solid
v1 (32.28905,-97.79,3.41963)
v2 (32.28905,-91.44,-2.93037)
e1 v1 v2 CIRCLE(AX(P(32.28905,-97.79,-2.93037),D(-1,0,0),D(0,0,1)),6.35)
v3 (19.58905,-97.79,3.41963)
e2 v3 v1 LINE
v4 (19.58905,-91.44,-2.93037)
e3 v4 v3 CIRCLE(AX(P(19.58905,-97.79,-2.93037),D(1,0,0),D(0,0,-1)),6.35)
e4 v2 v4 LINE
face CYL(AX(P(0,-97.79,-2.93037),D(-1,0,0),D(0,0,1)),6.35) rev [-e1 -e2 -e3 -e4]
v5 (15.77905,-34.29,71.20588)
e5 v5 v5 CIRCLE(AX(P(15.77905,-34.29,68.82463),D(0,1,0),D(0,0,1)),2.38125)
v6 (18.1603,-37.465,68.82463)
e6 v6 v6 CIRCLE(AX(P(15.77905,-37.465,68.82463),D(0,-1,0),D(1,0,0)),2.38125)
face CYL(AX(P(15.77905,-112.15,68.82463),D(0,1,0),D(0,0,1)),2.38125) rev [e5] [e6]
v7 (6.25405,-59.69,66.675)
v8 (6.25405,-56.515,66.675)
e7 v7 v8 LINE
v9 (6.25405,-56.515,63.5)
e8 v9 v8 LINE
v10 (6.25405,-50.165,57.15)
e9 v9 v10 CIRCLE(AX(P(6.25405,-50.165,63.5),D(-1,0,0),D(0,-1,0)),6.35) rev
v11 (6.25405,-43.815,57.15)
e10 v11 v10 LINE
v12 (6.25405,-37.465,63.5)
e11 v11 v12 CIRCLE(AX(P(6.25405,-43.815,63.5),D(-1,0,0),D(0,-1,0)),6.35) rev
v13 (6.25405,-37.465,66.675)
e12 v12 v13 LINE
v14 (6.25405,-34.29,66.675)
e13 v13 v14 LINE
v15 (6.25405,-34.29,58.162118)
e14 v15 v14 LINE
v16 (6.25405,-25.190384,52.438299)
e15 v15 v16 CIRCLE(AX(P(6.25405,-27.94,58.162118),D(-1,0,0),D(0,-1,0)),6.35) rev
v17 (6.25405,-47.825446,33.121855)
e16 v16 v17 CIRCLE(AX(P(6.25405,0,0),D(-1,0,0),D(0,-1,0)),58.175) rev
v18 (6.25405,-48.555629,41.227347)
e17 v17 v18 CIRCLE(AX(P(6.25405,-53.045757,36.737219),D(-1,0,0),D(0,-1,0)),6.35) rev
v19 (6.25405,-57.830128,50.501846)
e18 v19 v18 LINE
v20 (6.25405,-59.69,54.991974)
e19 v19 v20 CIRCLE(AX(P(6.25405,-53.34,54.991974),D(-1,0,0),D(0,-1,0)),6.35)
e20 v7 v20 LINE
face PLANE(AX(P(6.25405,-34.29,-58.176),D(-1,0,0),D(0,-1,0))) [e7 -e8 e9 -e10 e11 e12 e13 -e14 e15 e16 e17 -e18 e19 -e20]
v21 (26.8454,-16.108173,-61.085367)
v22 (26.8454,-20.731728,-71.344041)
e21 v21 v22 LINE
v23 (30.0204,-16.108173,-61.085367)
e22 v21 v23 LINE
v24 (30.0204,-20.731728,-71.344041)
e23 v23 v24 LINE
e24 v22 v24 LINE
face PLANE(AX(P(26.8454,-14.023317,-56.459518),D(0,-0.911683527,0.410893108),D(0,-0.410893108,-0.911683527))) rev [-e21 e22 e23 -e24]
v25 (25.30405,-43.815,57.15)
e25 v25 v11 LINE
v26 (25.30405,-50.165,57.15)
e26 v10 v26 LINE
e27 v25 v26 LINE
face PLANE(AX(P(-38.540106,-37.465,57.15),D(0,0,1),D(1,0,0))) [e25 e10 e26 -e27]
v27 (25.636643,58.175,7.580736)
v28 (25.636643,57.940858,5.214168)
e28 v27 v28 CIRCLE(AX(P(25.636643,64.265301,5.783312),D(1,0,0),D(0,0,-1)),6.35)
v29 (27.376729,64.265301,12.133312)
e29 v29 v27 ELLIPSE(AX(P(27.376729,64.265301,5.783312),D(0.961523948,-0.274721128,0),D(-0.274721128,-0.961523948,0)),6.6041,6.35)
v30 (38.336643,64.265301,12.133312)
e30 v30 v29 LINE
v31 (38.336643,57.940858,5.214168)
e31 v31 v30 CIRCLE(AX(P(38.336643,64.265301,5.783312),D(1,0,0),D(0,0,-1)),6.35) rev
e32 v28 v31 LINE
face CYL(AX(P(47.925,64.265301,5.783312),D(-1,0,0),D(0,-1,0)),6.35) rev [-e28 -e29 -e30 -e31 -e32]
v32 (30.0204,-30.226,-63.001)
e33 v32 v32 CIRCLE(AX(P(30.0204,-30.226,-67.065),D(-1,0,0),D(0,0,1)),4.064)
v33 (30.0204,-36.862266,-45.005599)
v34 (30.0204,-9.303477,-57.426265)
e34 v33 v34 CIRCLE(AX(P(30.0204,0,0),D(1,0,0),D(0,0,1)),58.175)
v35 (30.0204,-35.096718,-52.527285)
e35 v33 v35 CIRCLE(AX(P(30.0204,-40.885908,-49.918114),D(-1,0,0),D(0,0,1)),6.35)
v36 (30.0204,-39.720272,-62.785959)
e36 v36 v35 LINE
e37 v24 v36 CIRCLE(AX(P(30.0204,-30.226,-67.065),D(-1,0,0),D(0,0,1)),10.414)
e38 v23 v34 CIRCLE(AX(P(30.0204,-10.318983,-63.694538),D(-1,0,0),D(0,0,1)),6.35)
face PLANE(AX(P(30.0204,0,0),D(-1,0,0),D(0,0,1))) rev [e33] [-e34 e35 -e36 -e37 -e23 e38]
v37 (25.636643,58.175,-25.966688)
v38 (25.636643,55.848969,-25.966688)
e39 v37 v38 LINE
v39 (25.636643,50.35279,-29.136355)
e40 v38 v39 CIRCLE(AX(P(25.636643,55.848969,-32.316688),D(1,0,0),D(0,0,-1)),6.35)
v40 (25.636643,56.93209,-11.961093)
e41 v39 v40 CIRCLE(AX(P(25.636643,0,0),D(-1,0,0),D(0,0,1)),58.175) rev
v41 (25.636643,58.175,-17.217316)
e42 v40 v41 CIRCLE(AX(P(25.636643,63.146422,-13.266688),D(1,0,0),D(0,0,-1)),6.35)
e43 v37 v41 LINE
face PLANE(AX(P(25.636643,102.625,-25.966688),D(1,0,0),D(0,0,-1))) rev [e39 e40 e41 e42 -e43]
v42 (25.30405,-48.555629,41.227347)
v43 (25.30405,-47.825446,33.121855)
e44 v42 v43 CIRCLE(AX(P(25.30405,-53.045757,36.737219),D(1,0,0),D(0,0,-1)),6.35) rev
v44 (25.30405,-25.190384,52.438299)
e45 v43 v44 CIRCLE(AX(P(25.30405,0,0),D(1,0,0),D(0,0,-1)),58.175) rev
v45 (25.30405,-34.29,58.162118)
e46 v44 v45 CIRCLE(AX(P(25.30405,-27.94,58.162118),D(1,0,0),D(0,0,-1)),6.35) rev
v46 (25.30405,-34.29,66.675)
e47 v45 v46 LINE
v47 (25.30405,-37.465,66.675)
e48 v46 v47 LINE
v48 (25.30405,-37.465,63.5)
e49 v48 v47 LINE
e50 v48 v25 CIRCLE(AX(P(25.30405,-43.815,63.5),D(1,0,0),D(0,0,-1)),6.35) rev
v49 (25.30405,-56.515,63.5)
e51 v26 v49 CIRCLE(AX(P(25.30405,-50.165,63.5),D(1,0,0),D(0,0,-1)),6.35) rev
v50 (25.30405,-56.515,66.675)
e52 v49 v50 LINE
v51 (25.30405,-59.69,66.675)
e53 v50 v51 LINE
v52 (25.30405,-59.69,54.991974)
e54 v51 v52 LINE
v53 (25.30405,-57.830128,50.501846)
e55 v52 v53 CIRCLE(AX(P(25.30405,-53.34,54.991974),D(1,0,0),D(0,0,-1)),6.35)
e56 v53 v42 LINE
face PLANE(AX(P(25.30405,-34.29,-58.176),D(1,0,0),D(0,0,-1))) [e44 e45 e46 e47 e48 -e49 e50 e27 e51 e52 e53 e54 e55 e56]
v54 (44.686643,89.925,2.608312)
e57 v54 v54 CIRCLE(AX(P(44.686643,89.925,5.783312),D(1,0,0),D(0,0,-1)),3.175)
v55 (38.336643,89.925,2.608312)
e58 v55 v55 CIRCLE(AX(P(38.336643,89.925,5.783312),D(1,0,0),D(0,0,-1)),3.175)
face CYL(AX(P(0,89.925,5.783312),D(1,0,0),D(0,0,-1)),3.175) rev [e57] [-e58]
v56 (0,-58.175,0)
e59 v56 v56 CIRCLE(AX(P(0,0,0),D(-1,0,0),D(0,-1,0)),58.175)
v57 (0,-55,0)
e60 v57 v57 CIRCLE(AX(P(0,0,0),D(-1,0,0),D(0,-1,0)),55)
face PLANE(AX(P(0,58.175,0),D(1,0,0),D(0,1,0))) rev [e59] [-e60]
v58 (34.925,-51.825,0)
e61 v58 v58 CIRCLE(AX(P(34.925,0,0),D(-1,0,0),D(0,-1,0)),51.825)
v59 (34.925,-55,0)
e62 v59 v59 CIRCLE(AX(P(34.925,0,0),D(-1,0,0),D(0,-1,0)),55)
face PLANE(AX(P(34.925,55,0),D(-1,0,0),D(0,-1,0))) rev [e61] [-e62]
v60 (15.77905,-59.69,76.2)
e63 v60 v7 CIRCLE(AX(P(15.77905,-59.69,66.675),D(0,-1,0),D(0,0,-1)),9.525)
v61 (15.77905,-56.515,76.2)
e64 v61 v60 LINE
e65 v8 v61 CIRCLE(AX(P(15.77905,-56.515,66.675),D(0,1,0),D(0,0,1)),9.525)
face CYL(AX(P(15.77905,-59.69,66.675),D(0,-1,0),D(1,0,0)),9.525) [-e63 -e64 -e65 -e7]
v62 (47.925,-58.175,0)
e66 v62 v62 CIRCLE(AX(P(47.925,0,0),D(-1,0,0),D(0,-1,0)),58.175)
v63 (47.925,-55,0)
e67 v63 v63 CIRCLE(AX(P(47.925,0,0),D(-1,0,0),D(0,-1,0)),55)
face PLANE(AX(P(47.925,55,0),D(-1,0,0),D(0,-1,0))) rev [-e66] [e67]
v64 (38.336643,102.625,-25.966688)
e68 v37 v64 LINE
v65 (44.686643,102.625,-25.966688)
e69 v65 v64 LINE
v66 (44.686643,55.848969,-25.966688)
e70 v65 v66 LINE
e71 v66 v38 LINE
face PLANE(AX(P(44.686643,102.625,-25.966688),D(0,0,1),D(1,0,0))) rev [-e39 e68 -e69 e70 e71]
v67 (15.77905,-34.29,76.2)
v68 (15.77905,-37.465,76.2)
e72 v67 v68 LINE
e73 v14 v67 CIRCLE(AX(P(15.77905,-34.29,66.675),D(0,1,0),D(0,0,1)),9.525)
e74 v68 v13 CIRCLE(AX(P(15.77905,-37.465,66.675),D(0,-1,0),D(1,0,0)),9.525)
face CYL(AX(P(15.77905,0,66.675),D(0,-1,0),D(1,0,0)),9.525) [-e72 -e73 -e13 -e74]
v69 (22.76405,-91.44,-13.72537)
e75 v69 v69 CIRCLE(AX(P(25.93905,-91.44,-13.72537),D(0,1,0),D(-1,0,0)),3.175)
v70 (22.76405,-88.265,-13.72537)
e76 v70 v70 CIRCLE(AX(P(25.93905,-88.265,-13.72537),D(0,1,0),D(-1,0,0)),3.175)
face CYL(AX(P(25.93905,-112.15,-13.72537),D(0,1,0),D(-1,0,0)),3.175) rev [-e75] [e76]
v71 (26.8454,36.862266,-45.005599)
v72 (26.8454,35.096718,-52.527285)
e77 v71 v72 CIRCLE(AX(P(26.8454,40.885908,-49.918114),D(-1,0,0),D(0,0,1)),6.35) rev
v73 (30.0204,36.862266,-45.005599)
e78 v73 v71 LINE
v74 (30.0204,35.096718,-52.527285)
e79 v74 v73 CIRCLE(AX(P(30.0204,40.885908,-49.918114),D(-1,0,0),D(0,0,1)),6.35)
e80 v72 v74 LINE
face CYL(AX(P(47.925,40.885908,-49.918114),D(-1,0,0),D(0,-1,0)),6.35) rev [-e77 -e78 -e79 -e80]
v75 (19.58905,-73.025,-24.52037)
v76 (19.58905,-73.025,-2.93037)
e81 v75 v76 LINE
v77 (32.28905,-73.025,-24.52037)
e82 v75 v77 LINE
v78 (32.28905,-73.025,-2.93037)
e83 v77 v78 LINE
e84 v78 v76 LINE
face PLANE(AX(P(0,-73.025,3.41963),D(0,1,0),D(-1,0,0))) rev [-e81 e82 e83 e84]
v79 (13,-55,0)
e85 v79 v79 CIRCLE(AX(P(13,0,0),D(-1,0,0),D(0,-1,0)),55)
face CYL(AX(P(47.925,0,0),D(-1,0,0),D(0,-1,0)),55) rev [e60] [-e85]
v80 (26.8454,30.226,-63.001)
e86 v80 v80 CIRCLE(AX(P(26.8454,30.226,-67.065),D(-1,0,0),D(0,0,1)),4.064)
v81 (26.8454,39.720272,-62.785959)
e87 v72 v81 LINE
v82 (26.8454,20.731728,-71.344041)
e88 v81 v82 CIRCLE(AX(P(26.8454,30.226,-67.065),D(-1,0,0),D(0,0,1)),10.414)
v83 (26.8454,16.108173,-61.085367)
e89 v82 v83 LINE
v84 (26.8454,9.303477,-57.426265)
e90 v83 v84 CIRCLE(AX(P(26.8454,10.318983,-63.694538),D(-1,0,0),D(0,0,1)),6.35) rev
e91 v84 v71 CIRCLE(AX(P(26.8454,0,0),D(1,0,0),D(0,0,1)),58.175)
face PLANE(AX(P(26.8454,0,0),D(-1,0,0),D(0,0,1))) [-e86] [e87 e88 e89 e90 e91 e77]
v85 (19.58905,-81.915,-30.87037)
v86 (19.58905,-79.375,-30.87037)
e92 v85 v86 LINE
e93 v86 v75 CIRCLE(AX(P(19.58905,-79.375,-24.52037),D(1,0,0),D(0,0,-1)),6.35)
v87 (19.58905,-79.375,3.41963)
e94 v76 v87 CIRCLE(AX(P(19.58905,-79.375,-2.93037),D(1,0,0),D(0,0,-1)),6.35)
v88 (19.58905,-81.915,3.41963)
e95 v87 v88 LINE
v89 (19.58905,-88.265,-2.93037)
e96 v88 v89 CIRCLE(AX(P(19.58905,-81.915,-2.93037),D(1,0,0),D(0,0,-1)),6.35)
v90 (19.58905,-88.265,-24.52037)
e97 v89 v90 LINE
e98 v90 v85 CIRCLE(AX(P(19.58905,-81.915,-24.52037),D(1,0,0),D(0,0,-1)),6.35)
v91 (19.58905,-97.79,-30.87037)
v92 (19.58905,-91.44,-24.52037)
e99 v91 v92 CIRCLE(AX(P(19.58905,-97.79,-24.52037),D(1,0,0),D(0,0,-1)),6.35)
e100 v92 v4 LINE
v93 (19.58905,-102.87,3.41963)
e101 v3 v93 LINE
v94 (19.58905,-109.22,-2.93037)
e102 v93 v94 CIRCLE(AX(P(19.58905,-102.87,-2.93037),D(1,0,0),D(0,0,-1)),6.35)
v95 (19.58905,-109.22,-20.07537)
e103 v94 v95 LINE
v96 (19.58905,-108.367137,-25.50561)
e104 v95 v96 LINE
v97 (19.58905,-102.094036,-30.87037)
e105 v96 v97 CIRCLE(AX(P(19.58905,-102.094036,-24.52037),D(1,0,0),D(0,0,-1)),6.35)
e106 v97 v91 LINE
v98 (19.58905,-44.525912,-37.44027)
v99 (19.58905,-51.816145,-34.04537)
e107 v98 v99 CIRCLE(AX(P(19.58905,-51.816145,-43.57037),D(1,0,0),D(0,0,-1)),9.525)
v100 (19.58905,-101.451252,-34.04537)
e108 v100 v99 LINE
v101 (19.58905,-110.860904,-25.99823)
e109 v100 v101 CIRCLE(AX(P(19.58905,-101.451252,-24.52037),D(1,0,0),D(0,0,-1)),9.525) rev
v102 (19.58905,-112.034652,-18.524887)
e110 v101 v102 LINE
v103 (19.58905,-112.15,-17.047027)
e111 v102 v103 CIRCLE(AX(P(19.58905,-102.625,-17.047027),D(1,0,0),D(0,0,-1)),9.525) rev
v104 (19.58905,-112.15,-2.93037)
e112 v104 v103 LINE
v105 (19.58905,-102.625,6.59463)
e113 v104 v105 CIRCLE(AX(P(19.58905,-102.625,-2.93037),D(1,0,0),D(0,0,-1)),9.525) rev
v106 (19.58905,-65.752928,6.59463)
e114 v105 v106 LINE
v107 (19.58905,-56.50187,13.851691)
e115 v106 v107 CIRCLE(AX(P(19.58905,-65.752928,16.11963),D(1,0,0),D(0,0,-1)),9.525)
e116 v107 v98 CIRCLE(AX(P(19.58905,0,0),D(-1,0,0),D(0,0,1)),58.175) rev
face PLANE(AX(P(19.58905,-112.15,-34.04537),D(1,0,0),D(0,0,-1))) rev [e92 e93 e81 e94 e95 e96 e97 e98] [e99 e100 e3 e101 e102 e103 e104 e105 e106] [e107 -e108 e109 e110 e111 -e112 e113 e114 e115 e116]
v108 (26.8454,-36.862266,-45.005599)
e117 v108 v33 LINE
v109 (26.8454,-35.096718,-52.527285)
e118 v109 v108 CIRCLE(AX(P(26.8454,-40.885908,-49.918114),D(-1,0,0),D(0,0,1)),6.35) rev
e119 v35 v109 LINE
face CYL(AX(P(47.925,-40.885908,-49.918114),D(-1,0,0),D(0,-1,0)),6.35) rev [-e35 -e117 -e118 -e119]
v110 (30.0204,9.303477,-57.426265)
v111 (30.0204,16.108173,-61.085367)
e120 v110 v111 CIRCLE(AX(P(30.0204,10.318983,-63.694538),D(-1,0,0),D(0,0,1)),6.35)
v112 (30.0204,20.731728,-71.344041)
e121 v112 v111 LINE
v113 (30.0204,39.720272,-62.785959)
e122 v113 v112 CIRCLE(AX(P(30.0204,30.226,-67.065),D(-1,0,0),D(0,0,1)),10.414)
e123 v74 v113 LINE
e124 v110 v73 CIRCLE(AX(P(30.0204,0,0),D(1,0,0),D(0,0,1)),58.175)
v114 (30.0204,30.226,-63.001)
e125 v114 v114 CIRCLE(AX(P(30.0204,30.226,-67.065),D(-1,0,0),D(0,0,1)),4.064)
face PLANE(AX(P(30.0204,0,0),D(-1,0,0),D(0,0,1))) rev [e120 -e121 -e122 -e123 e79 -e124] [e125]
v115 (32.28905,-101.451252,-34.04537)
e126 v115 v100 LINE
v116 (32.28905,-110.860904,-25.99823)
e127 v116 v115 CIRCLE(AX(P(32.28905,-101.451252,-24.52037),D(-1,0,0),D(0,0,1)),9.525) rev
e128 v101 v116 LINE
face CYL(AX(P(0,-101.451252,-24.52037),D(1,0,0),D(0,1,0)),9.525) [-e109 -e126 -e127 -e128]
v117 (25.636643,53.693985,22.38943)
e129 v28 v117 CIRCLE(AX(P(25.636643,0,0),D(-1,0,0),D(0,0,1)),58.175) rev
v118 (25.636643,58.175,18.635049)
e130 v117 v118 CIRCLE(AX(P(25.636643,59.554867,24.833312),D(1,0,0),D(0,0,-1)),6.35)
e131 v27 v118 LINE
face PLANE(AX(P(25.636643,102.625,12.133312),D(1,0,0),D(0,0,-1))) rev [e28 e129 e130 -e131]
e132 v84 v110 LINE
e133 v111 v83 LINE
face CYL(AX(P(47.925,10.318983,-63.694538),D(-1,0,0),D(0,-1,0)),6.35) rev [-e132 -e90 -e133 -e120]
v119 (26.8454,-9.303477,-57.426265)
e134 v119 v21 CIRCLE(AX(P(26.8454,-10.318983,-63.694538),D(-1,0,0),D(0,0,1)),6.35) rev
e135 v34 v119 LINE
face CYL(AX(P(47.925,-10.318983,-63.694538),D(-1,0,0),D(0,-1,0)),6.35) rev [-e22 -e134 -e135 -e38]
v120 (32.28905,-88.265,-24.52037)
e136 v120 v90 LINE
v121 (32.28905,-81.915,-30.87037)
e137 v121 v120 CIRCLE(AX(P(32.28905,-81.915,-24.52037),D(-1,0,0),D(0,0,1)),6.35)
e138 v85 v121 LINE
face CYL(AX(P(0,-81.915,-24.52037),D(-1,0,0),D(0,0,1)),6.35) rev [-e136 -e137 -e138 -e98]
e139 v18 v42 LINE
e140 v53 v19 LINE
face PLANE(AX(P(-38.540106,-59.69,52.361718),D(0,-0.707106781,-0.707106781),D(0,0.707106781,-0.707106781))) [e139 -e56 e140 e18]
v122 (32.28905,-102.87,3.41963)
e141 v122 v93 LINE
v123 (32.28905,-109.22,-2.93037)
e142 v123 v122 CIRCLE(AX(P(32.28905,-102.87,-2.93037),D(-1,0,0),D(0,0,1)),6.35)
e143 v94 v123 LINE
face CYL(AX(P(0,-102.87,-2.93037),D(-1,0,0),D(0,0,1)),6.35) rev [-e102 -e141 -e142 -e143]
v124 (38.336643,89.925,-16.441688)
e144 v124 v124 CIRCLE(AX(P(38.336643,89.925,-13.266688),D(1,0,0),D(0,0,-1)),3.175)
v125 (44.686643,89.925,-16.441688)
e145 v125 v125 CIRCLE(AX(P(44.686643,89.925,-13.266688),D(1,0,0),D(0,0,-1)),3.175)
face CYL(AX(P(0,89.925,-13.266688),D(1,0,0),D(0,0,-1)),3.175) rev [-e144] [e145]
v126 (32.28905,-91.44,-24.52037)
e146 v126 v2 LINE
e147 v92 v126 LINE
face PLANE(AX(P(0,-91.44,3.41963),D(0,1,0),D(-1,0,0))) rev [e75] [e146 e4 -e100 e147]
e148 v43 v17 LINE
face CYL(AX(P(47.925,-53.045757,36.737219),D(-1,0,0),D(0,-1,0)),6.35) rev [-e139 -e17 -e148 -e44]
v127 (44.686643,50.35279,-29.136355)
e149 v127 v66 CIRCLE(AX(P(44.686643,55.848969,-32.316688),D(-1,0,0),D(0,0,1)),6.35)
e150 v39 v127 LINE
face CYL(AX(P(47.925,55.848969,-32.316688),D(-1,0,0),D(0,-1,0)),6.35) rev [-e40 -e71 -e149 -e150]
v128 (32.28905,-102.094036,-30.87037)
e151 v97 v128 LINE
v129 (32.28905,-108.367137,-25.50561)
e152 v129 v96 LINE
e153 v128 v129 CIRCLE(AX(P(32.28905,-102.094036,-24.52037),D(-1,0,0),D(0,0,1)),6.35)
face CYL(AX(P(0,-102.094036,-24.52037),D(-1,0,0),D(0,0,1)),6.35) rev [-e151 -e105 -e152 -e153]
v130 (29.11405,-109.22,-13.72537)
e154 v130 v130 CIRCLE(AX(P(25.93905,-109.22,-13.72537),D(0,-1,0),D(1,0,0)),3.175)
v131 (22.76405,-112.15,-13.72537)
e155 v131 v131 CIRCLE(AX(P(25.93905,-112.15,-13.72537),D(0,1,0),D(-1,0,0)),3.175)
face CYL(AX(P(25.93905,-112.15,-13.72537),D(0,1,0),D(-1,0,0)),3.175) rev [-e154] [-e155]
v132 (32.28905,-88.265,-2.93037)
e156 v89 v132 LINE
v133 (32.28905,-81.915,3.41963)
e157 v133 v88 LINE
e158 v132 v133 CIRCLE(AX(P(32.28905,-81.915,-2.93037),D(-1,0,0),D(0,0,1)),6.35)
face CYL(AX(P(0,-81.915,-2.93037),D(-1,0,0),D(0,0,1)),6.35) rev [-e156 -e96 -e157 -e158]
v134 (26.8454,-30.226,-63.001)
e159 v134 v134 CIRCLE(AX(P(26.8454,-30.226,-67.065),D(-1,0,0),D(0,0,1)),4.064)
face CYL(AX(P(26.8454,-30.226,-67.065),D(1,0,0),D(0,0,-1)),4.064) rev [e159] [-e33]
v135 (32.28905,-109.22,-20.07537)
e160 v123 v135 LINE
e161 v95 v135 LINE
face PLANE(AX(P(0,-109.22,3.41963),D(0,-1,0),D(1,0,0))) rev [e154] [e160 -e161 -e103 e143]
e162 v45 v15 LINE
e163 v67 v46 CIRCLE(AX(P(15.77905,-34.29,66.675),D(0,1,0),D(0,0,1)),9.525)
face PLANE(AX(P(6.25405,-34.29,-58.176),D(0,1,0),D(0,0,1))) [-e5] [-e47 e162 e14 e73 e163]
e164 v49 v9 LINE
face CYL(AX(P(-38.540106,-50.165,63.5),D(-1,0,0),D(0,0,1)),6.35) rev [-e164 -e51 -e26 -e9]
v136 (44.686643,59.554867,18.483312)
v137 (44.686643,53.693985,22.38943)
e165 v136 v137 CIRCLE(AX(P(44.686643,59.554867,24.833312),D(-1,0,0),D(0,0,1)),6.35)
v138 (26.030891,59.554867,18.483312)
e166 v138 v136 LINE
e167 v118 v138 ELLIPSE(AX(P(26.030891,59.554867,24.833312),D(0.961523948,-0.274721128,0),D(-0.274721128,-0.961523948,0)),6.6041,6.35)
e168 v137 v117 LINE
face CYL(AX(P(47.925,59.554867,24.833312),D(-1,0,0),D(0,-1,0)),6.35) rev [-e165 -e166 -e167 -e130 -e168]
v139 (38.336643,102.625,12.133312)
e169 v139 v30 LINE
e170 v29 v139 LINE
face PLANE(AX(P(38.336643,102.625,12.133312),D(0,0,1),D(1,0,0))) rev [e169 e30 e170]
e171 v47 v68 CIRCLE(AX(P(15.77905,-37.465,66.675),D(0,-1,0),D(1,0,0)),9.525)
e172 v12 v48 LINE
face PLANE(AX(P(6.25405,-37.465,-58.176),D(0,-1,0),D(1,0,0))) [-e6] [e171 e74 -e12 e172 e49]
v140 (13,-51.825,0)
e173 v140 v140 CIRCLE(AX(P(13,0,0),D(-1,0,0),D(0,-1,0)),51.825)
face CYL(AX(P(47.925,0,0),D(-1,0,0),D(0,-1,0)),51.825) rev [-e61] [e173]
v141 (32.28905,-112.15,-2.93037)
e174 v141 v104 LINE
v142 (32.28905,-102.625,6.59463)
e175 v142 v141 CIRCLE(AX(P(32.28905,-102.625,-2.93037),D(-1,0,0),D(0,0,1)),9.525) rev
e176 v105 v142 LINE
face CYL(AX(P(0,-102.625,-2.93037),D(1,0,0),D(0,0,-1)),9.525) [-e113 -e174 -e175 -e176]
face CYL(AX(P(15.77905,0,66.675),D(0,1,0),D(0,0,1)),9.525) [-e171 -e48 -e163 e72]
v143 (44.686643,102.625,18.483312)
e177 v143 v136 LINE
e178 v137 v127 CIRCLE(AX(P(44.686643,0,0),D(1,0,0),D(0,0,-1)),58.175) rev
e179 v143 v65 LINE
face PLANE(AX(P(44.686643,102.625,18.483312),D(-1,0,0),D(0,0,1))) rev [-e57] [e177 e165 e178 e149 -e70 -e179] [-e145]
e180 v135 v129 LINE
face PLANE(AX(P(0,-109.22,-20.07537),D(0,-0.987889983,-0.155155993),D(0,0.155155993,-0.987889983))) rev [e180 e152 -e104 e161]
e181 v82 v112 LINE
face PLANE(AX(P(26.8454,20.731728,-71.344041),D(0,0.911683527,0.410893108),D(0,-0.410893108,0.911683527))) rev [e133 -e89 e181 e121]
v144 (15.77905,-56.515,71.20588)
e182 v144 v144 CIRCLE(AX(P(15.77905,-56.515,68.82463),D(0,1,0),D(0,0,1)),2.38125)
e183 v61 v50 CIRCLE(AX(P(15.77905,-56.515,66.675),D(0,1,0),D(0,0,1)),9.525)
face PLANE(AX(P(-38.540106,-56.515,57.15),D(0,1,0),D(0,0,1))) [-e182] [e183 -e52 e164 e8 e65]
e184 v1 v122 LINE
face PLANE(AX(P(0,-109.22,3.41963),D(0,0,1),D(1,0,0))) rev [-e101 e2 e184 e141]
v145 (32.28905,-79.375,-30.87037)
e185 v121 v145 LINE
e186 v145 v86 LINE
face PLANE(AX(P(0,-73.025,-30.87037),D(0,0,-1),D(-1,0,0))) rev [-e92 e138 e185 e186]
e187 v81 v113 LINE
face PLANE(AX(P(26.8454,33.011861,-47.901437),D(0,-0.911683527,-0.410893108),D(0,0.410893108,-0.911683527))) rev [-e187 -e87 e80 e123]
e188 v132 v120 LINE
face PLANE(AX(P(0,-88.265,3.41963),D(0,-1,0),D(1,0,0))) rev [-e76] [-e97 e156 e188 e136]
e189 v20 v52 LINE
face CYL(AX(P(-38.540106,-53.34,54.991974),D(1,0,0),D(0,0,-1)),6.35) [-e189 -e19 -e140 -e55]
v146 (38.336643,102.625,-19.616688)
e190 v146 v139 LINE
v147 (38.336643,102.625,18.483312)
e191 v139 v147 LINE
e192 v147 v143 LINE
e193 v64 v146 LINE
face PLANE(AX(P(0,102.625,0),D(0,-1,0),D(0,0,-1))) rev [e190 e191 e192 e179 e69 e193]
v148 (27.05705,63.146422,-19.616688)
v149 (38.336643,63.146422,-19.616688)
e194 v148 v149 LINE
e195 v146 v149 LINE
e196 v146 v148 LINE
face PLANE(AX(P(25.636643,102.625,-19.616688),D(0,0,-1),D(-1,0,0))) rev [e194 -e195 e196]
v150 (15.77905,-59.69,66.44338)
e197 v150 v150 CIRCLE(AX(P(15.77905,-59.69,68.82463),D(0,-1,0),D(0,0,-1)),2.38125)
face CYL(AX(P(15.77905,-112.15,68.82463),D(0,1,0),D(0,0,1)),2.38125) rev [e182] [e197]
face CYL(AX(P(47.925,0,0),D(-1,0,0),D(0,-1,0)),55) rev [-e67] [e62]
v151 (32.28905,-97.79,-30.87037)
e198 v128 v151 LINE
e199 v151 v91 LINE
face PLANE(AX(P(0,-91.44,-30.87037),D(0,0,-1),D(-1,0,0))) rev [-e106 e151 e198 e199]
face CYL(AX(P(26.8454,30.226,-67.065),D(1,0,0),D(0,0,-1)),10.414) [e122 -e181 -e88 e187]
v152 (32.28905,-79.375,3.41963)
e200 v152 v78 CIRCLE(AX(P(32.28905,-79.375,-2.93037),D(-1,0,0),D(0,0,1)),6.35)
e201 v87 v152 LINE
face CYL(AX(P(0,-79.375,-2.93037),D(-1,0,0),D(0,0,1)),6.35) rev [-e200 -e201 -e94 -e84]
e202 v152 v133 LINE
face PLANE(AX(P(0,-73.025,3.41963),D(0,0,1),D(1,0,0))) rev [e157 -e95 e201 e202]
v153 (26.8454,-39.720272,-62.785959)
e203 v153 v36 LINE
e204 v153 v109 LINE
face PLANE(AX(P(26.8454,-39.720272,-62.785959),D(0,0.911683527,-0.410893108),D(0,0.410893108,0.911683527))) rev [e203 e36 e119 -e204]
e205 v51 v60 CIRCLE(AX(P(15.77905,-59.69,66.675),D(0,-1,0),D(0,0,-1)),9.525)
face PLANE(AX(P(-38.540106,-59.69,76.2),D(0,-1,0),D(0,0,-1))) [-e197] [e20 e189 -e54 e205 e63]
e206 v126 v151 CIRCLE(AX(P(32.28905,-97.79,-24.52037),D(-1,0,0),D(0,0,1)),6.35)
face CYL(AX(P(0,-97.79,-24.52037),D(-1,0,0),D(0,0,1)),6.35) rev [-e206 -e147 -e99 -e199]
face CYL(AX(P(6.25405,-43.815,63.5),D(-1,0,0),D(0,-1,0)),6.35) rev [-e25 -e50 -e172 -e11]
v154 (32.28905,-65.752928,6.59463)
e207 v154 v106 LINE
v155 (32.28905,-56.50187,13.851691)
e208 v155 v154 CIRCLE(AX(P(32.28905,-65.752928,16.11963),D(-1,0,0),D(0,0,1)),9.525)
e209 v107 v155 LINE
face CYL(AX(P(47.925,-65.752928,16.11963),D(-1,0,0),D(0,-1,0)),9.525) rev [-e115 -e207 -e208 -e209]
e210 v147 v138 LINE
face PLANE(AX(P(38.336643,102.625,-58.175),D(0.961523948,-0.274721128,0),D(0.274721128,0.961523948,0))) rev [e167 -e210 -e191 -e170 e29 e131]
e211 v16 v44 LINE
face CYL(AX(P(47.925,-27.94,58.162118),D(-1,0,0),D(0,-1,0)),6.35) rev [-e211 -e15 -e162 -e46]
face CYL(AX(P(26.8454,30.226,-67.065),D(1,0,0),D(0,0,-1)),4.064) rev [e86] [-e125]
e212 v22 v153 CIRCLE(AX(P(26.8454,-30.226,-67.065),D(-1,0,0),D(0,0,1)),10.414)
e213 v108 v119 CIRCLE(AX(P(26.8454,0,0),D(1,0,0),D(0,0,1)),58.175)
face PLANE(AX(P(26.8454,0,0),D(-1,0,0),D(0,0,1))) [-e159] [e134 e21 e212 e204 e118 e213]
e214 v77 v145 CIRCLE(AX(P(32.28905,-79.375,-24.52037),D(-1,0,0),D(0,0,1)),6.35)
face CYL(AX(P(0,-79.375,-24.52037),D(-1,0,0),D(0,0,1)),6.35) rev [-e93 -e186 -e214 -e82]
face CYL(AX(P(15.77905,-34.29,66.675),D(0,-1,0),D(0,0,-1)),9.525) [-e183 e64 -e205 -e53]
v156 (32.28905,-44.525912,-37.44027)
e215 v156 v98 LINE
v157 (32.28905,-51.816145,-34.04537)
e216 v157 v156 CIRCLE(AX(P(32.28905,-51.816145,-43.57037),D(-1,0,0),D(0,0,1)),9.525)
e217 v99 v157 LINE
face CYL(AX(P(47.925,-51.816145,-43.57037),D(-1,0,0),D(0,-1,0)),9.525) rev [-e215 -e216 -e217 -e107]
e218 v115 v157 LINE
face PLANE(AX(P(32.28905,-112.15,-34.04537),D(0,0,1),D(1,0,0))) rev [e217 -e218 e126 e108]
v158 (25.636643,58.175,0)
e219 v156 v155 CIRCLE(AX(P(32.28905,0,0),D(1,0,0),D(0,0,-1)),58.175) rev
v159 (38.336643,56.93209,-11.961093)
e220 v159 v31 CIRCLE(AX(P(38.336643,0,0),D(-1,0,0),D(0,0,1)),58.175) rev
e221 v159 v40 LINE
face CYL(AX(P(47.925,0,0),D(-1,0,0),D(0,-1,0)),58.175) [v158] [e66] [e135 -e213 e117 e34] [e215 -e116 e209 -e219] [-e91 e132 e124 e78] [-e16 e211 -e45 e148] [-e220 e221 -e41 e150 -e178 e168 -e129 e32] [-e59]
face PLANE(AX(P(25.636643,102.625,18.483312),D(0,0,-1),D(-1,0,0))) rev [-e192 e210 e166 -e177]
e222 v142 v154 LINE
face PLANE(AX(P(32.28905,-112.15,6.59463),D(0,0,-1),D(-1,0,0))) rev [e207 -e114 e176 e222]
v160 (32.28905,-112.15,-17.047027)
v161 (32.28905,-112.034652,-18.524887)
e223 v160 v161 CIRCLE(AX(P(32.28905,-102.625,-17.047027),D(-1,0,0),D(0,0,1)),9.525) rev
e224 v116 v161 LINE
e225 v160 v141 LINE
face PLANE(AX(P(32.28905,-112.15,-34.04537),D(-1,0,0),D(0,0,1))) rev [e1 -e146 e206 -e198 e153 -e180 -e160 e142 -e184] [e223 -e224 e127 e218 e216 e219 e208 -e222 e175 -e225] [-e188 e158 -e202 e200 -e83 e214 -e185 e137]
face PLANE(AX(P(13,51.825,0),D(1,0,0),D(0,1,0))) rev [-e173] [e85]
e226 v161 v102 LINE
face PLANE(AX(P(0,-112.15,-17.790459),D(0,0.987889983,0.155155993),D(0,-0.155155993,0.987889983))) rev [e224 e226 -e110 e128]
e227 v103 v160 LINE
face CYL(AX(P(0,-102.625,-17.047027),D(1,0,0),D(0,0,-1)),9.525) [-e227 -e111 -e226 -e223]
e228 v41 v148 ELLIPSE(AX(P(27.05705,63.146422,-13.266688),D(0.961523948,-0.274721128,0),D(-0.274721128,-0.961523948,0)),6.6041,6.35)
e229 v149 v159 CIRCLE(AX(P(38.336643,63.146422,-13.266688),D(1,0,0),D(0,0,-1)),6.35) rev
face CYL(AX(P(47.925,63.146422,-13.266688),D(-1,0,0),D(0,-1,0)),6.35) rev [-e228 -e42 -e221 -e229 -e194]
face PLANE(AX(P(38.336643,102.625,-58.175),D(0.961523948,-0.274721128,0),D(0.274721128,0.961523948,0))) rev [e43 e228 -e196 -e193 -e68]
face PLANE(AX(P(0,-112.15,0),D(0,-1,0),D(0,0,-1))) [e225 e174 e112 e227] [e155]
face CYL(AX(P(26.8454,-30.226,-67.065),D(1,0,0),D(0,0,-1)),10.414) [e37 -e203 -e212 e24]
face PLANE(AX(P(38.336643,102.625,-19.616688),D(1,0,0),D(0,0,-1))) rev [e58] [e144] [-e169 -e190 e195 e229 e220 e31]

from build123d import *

# Parameters (mm, degrees)
BOSS_EXTRUDE1_REACH                  = 156.071
BOSS_EXTRUDE1_END_RADIUS             = 58.175
SKETCH2_W                            = 19.05
SKETCH2_H                            = 3.175
BOSS_EXTRUDE2_DEPTH                  = 44.45
BOSS_EXTRUDE2_DIRECTION_2_REACH      = 149.107
BOSS_EXTRUDE2_DIRECTION_2_END_RADIUS = 58.175
CUT_EXTRUDE1_DEPTH                   = 137.766929844
CUT_EXTRUDE1_DEPTH_BACK              = 137.766929844
BOSS_EXTRUDE3_REACH                  = 186.282
BOSS_EXTRUDE3_END_RADIUS             = 58.175
SKETCH7_W                            = 12.7
SKETCH7_H                            = 40.64
BOSS_EXTRUDE3_DIRECTION_2_DEPTH      = 53.975
SKETCH8_W                            = 34.29
SKETCH8_H                            = 15.24
CUT_EXTRUDE4_DEPTH                   = 140.379500782
SKETCH10_R                           = 4.064
BOSS_EXTRUDE5_DEPTH                  = 3.175
BOSS_EXTRUDE6_DEPTH                  = 19.05
CUT_EXTRUDE2_DEPTH                   = 165.455216673
CUT_EXTRUDE2_DEPTH_BACK              = 165.455216673
SKETCH6_R                            = 2.38125
SKETCH12_R                           = 3.175
CUT_EXTRUDE5_DEPTH                   = 144.448645948
F_0_25_FILLET5_R                     = 6.35
SKETCH13_R                           = 3.175
CUT_EXTRUDE6_DEPTH                   = 212.515467912
F_0_375_FILLET6_R                    = 9.525


# Some blends are built 0.0001 mm under size
with BuildPart() as part:
    # Sketch1 → Revolve1 (revolve)
    with BuildSketch(Plane.XY, mode=Mode.PRIVATE) as revolve1_sk:
        Polygon((47.925, 55), (34.925, 55), (34.925, 51.825), (13, 51.825), (13, 55), (0, 55), (0, 58.175), (47.925, 58.175), align=None)
    revolve(revolve1_sk.sketch.rotate(Axis((47.925, 0, 0), (-1, 0, 0)), 180), axis=Axis((47.925, 0, 0), (-1, 0, 0)))

    # Boss-Extrude1: up to this cylinder (the profile starts outside it)
    boss_extrude1_end = Plane(origin=(15.77905, 0, 0), z_dir=(-1, 0, 0)) * Cylinder(BOSS_EXTRUDE1_END_RADIUS, 429.492, mode=Mode.PRIVATE)
    # Sketch2 → Boss-Extrude1 (add, up to the surface)
    with BuildSketch(Plane.XY.offset(76.2), mode=Mode.PRIVATE) as boss_extrude1_sk1:
        with Locations((15.77904982, -35.8775)):
            Rectangle(SKETCH2_W, SKETCH2_H)
    boss_extrude1_tool1 = extrude(boss_extrude1_sk1.sketch, amount=-BOSS_EXTRUDE1_REACH, mode=Mode.PRIVATE) - boss_extrude1_end
    add(boss_extrude1_tool1.solids().sort_by_distance((15.77905, -35.8775, 76.2))[0])

    # Sketch4 → Boss-Extrude2 (add)
    with BuildSketch(Plane(origin=(0, 58.175, 0), x_dir=(1, 0, 0), z_dir=(0, 1, 0))):
        Polygon((38.336643231, 19.616687671), (38.336643231, -12.133312329), (25.636643231, -12.133312329), (25.636643231, -18.483312329), (44.686643231, -18.483312329), (44.686643231, 25.966687671), (25.636643231, 25.966687671), (25.636643231, 19.616687671), align=None)
    extrude(amount=BOSS_EXTRUDE2_DEPTH)

    # Boss-Extrude2 direction 2: up to this cylinder (the profile starts outside it)
    boss_extrude2_direction_2_end = Plane(origin=(38.820245, 0, 0), z_dir=(-1, 0, 0)) * Cylinder(BOSS_EXTRUDE2_DIRECTION_2_END_RADIUS, 415.564, mode=Mode.PRIVATE)
    # Sketch4 → Boss-Extrude2 direction 2 (add, up to the surface)
    with BuildSketch(Plane(origin=(0, 58.175, 0), x_dir=(1, 0, 0), z_dir=(0, 1, 0)), mode=Mode.PRIVATE) as boss_extrude2_direction_2_sk1:
        Polygon((38.336643231, 19.616687671), (38.336643231, -12.133312329), (25.636643231, -12.133312329), (25.636643231, -18.483312329), (44.686643231, -18.483312329), (44.686643231, 25.966687671), (25.636643231, 25.966687671), (25.636643231, 19.616687671), align=None)
    boss_extrude2_direction_2_tool1 = extrude(boss_extrude2_direction_2_sk1.sketch, amount=-BOSS_EXTRUDE2_DIRECTION_2_REACH, mode=Mode.PRIVATE) - boss_extrude2_direction_2_end
    add(boss_extrude2_direction_2_tool1.solids().sort_by_distance((38.820245, 58.175, -3.741688))[0])
    add(boss_extrude2_direction_2_tool1.solids().sort_by_distance((38.820245, 58.175, -3.741688))[1])

    # Sketch5 → Cut-Extrude1 (cut, two sides: drawn at the far end of the back side and taken through both)
    with BuildSketch(Plane.XY.offset(18.483312329).offset(-CUT_EXTRUDE1_DEPTH_BACK)):
        Polygon((38.336643231, 102.625), (25.636643231, 58.175), (25.636643231, 102.625), align=None)
    extrude(amount=CUT_EXTRUDE1_DEPTH + CUT_EXTRUDE1_DEPTH_BACK, mode=Mode.SUBTRACT)

    # Boss-Extrude3: up to this cylinder (the profile starts outside it)
    boss_extrude3_end = Plane(origin=(25.93905, 0, 0), z_dir=(-1, 0, 0)) * Cylinder(BOSS_EXTRUDE3_END_RADIUS, 489.914, mode=Mode.PRIVATE)
    # Sketch7 → Boss-Extrude3 (add, up to the surface)
    with BuildSketch(Plane(origin=(0, -58.175, 0), x_dir=(-1, 0, 0), z_dir=(0, -1, 0)), mode=Mode.PRIVATE) as boss_extrude3_sk1:
        with Locations((-25.93904982, 13.725369625)):
            Rectangle(SKETCH7_W, SKETCH7_H)
    boss_extrude3_tool1 = extrude(boss_extrude3_sk1.sketch, amount=-BOSS_EXTRUDE3_REACH, mode=Mode.PRIVATE) - boss_extrude3_end
    add(boss_extrude3_tool1.solids().sort_by_distance((25.93905, -58.175, -13.72537))[0])
    add(boss_extrude3_tool1.solids().sort_by_distance((25.93905, -58.175, -13.72537))[1])

    # Sketch7 → Boss-Extrude3 direction 2 (add)
    with BuildSketch(Plane(origin=(0, -58.175, 0), x_dir=(-1, 0, 0), z_dir=(0, -1, 0))):
        with Locations((-25.93904982, 13.725369625)):
            Rectangle(SKETCH7_W, SKETCH7_H)
    extrude(amount=BOSS_EXTRUDE3_DIRECTION_2_DEPTH)

    # Sketch8 → Cut-Extrude4 (cut, through all)
    with BuildSketch(Plane(origin=(32.28904982, 0, 0), x_dir=(0, 0, -1), z_dir=(1, 0, 0))):
        Polygon((-3.419630375, -109.22), (20.075369625, -109.22), (30.870369625, -107.524559238), (30.870369625, -91.44), (-3.419630375, -91.44), align=None)
        Polygon((17.790458535, -112.15), (34.045369625, -109.597036698), (34.045369625, -112.15), align=None)
        with Locations((13.725369625, -80.645)):
            Rectangle(SKETCH8_W, SKETCH8_H)
    extrude(amount=-CUT_EXTRUDE4_DEPTH, mode=Mode.SUBTRACT)

    # Sketch10 → Boss-Extrude5 (add)
    # profile 1 of 2: a face of its own
    with BuildSketch(Plane.ZY.offset(-30.0204)):
        with BuildLine():
            Line((-56.459518326, -14.023316846), (-71.344040827, -20.731727748))
            ThreePointArc((-71.344040827, -20.731727748), (-76.559272252, -34.505040827), (-62.785959173, -39.720272252))
            Line((-62.785959173, -39.720272252), (-47.901436671, -33.01186135))
            ThreePointArc((-47.901436671, -33.01186135), (-53.037189194, -23.903706562), (-56.459518326, -14.023316846))
        make_face()
        with Locations((-67.065, -30.226)):
            Circle(SKETCH10_R, mode=Mode.SUBTRACT)
    # profile 2 of 2: a face of its own
    with BuildSketch(Plane.ZY.offset(-30.0204)):
        with BuildLine():
            Line((-47.901436671, 33.01186135), (-62.785959173, 39.720272252))
            ThreePointArc((-62.785959173, 39.720272252), (-76.559272252, 34.505040827), (-71.344040827, 20.731727748))
            Line((-71.344040827, 20.731727748), (-56.459518326, 14.023316846))
            ThreePointArc((-56.459518326, 14.023316846), (-53.037189194, 23.903706562), (-47.901436671, 33.01186135))
        make_face()
        with Locations((-67.065, 30.226)):
            Circle(SKETCH10_R, mode=Mode.SUBTRACT)
    extrude(amount=BOSS_EXTRUDE5_DEPTH)

    # Sketch9 → Boss-Extrude6 (add)
    with BuildSketch(Plane(origin=(25.30404982, 0, 0), x_dir=(0, 0, -1), z_dir=(1, 0, 0))):
        with BuildLine():
            Line((-44.505105325, -37.465), (-57.15, -37.465))
            Line((-57.15, -37.465), (-57.15, -56.515))
            Line((-57.15, -56.515), (-76.2, -56.515))
            Line((-76.2, -56.515), (-76.2, -59.69))
            Line((-76.2, -59.69), (-52.361717737, -59.69))
            Line((-52.361717737, -59.69), (-37.308281085, -44.636563348))
            ThreePointArc((-37.308281085, -44.636563348), (-41.063552929, -41.208193916), (-44.505105325, -37.465))
        make_face()
    extrude(amount=-BOSS_EXTRUDE6_DEPTH)

    # Sketch6 → Cut-Extrude2 (cut, two sides: drawn at the far end of the back side and taken through both)
    with BuildSketch(Plane(origin=(0, -34.29, 0), x_dir=(1, 0, 0), z_dir=(0, 1, 0)).offset(-CUT_EXTRUDE2_DEPTH_BACK)):
        with Locations(Location((15.77904982, -68.824630375, 0), (0, 0, 270))):
            Circle(SKETCH6_R)
    extrude(amount=CUT_EXTRUDE2_DEPTH + CUT_EXTRUDE2_DEPTH_BACK, mode=Mode.SUBTRACT)

    # Sketch12 → Cut-Extrude5 (cut, through all)
    with BuildSketch(Plane(origin=(44.686643231, 0, 0), x_dir=(0, 0, -1), z_dir=(1, 0, 0))):
        with Locations((-5.783312329, 89.925)):
            Circle(SKETCH12_R)
        with Locations((13.266687671, 89.925)):
            Circle(SKETCH12_R)
    extrude(amount=-CUT_EXTRUDE5_DEPTH, mode=Mode.SUBTRACT)

    # 0.25 Fillet5
    # the kernel refuses this fillet: 6.35 mm, written as the material it adds along each edge
    with BuildSketch(Plane(origin=(32.28904982, -107.524559238, -30.870369625), x_dir=(0, -0.15515599305949537, 0.9878899826487371), z_dir=(-1, 0, 0))) as f_0_25_fillet5_piece_1:
        with BuildLine():
            CenterArc((F_0_25_FILLET5_R * 0.855200499832, F_0_25_FILLET5_R), F_0_25_FILLET5_R, 188.925843448, 81.074156552)
            Line((-F_0_25_FILLET5_R * 0.132689482816, F_0_25_FILLET5_R * 0.844844006941), (0, 0))
            Line((0, 0), (F_0_25_FILLET5_R * 0.855200499832, 0))
        make_face()
    extrude(amount=12.7)
    with BuildSketch(Plane(origin=(32.28904982, -73.025, 3.419630375), x_dir=(0, -1, 0), z_dir=(-1, 0, 0)), Plane(origin=(32.28904982, -109.22, 3.419630375), x_dir=(0, 0, -1), z_dir=(-1, 0, 0))) as f_0_25_fillet5_piece_2:
        with BuildLine():
            CenterArc((F_0_25_FILLET5_R, -F_0_25_FILLET5_R), F_0_25_FILLET5_R, 90, 90)
            Line((0, -F_0_25_FILLET5_R), (0, 0))
            Line((0, 0), (F_0_25_FILLET5_R, 0))
        make_face()
    extrude(amount=12.7)
    with BuildSketch(Plane(origin=(32.28904982, -73.025, -30.870369625), x_dir=(0, -1, 0), z_dir=(-1, 0, 0)), Plane(origin=(32.28904982, -88.265, -30.870369625), x_dir=(0, 0, 1), z_dir=(-1, 0, 0)), Plane(origin=(32.28904982, -91.44, -30.870369625), x_dir=(0, -1, 0), z_dir=(-1, 0, 0)), Plane(origin=(32.28904982, -91.44, 3.419630375), x_dir=(0, 0, -1), z_dir=(-1, 0, 0)), Plane(origin=(32.28904982, -88.265, 3.419630375), x_dir=(0, 1, 0), z_dir=(-1, 0, 0))) as f_0_25_fillet5_piece_3:
        with BuildLine():
            CenterArc((F_0_25_FILLET5_R, F_0_25_FILLET5_R), F_0_25_FILLET5_R, 180, 90)
            Line((0, F_0_25_FILLET5_R), (0, 0))
            Line((0, 0), (F_0_25_FILLET5_R, 0))
        make_face()
    extrude(amount=12.7)
    with BuildSketch(Plane(origin=(44.686643231, 55.160654369, 18.483312329), x_dir=(0, -0.35151738961608436, 0.9361813525153627), z_dir=(-1, 0, 0))) as f_0_25_fillet5_piece_4_section:
        with BuildLine():
            CenterArc((4.400109316, 6.345915666), F_0_25_FILLET5_R, 200.580153558, 67.36473838)
            Line((-1.544642273, 4.113780242), (0, 0))
            ThreePointArc((0, 0), (2.086196898, 0.037418286), (4.172393797, 0))
        make_face()
    f_0_25_fillet5_piece_4 = extrude(amount=19.05, mode=Mode.PRIVATE)
    f_0_25_fillet5_piece_4 = split(f_0_25_fillet5_piece_4, bisect_by=Plane(origin=(25.731447174, 58.506813799, 19.322974334), z_dir=(0.9615239476408232, -0.274721127897378, 0)), keep=Keep.TOP, mode=Mode.PRIVATE)
    add(f_0_25_fillet5_piece_4)
    with BuildSketch(Plane(origin=(44.686643231, 52.058253489, -25.966687671), x_dir=(0, -0.4738240547164129, -0.8806195348571924), z_dir=(-1, 0, 0))) as f_0_25_fillet5_piece_5:
        with BuildLine():
            CenterArc((3.795801918, -6.346960756), F_0_25_FILLET5_R, 91.772763927, 59.944424143)
            Line((-1.796132128, -3.338178008), (0, 0))
            ThreePointArc((0, 0), (1.799680331, -0.027843787), (3.599360662, 0))
        make_face()
    extrude(amount=19.05)
    with BuildSketch(Plane(origin=(30.0204, 14.023316846, -56.459518326), x_dir=(0, -0.9796608965162138, -0.2006602298340364), z_dir=(-1, 0, 0)), Plane(origin=(30.0204, -33.01186135, -47.901436671), x_dir=(0, -0.7991988749934746, 0.6010666836626071), z_dir=(-1, 0, 0))) as f_0_25_fillet5_piece_6:
        with BuildLine():
            CenterArc((5.080771787, -6.344553716), F_0_25_FILLET5_R, 92.373186914, 74.9414324)
            Line((-1.114228568, -4.95011096), (0, 0))
            ThreePointArc((0, 0), (2.40891523, -0.049895678), (4.81783046, 0))
        make_face()
    extrude(amount=3.175)
    with BuildSketch(Plane(origin=(30.0204, 33.01186135, -47.901436671), x_dir=(0, 0.7991988749934751, 0.6010666836626063), z_dir=(-1, 0, 0)), Plane(origin=(30.0204, -14.023316846, -56.459518326), x_dir=(0, 0.979660896516214, -0.20066022983403448), z_dir=(-1, 0, 0))) as f_0_25_fillet5_piece_7:
        with BuildLine():
            CenterArc((5.080771787, 6.344553716), F_0_25_FILLET5_R, 192.685380686, 74.9414324)
            Line((-1.114228568, 4.95011096), (0, 0))
            ThreePointArc((0, 0), (2.40891523, 0.049895678), (4.81783046, 0))
        make_face()
    extrude(amount=3.175)
    with BuildSketch(Plane(origin=(25.30404982, -34.29, 46.994962762), x_dir=(0, 0.85817592135249, 0.5133557129425999), z_dir=(-1, 0, 0))) as f_0_25_fillet5_piece_8:
        with BuildLine():
            CenterArc((11.182140281, -6.323575362), F_0_25_FILLET5_R, 95.228847915, 115.658763837)
            Line((5.73272318, -9.583384139), (0, 0))
            ThreePointArc((0, 0), (5.30171973, -0.242087136), (10.60343946, 0))
        make_face()
    extrude(amount=19.05)
    with BuildSketch(Plane(origin=(25.30404982, -44.636563348, 37.308281085), x_dir=(0, -0.6059500759148755, -0.7955026747275943), z_dir=(-1, 0, 0))) as f_0_25_fillet5_piece_9:
        with BuildLine():
            CenterArc((5.549833192, 6.343501146), F_0_25_FILLET5_R, 187.702760348, 79.704814697)
            Line((-0.742869129, 5.492385703), (0, 0))
            ThreePointArc((0, 0), (2.631308443, 0.059538711), (5.262616886, 0))
        make_face()
    extrude(amount=19.05)
    with BuildSketch(Plane(origin=(25.30404982, -56.515, 57.15), x_dir=(0, 1, 0), z_dir=(-1, 0, 0))) as f_0_25_fillet5_piece_10:
        with BuildLine():
            CenterArc((F_0_25_FILLET5_R, -F_0_25_FILLET5_R), F_0_25_FILLET5_R, 90, 90)
            Line((0, -F_0_25_FILLET5_R), (0, 0))
            Line((0, 0), (F_0_25_FILLET5_R, 0))
        make_face()
    extrude(amount=19.05)
    with BuildSketch(Plane(origin=(25.30404982, -37.465, 57.15), x_dir=(0, -1, 0), z_dir=(-1, 0, 0))) as f_0_25_fillet5_piece_11:
        with BuildLine():
            CenterArc((F_0_25_FILLET5_R, F_0_25_FILLET5_R), F_0_25_FILLET5_R, 180, 90)
            Line((0, F_0_25_FILLET5_R), (0, 0))
            Line((0, 0), (F_0_25_FILLET5_R, 0))
        make_face()
    extrude(amount=19.05)
    with BuildSketch(Plane(origin=(56.760806798, 56.895635658, 12.133312329), x_dir=(0, 0.14936777245731006, -0.9887817092519163), z_dir=(-1, 0, 0))) as f_0_25_fillet5_piece_12_section:
        with BuildLine():
            CenterArc((7.379554362, -6.338505022), F_0_25_FILLET5_R, 93.448024752, 95.142265083)
            Line((1.100790509, -7.286990377), (0, 0))
            ThreePointArc((0, 0), (3.498822942, -0.10531029), (6.997645885, 0))
        make_face()
    f_0_25_fillet5_piece_12 = extrude(amount=31.124163567, mode=Mode.PRIVATE)
    f_0_25_fillet5_piece_12 = split(f_0_25_fillet5_piece_12, bisect_by=Plane(origin=(44.686643231, 58.858626786, 10.536201491), z_dir=(-1, 0, 0)), keep=Keep.TOP, mode=Mode.PRIVATE)
    f_0_25_fillet5_piece_12 = split(f_0_25_fillet5_piece_12, bisect_by=Plane(origin=(26.305635106, 60.51647156, 10.536201491), z_dir=(0.9615239476408232, -0.274721127897378, 0)), keep=Keep.TOP, mode=Mode.PRIVATE)
    add(f_0_25_fillet5_piece_12)
    with BuildSketch(Plane(origin=(59.283100941, 54.76783901, -19.616687671), x_dir=(0, 0.272040051802825, 0.9622859295527064), z_dir=(-1, 0, 0))) as f_0_25_fillet5_piece_13_section:
        with BuildLine():
            CenterArc((8.389825829, 6.335138282), F_0_25_FILLET5_R, 164.214302048, 101.864940185)
            Line((2.279310176, 8.062592611), (0, 0))
            ThreePointArc((0, 0), (3.977816769, 0.136154399), (7.955633539, 0))
        make_face()
    f_0_25_fillet5_piece_13 = extrude(amount=33.64645771, mode=Mode.PRIVATE)
    f_0_25_fillet5_piece_13 = split(f_0_25_fillet5_piece_13, bisect_by=Plane(origin=(44.686643231, 57.303527037, -17.828373859), z_dir=(-1, 0, 0)), keep=Keep.TOP, mode=Mode.PRIVATE)
    f_0_25_fillet5_piece_13 = split(f_0_25_fillet5_piece_13, bisect_by=Plane(origin=(25.888622091, 59.056926007, -17.828373859), z_dir=(0.9615239476408232, -0.274721127897378, 0)), keep=Keep.TOP, mode=Mode.PRIVATE)
    add(f_0_25_fillet5_piece_13)
    # the kernel refuses this fillet: 6.35 mm, written as the material it takes off along each edge
    with BuildSketch(Plane(origin=(31.879690122, -59.69, 52.361717737), x_dir=(0, 0, 1), z_dir=(-1, 0, 0))) as f_0_25_fillet5_2_piece_1:
        with BuildLine():
            CenterArc((F_0_25_FILLET5_R * 0.414213562373, F_0_25_FILLET5_R), F_0_25_FILLET5_R, 225, 45)
            Line((-F_0_25_FILLET5_R * 0.292893218813, F_0_25_FILLET5_R * 0.292893218813), (0, 0))
            Line((0, 0), (F_0_25_FILLET5_R * 0.414213562373, 0))
        make_face()
    extrude(amount=32.201280605, mode=Mode.SUBTRACT)

    # Sketch13 → Cut-Extrude6 (cut, through all)
    with BuildSketch(Plane(origin=(0, -88.265, 0), x_dir=(1, 0, 0), z_dir=(0, 1, 0))):
        with Locations(Location((25.93904982, 13.725369625, 0), (0, 0, 180))):
            Circle(SKETCH13_R)
    extrude(amount=-CUT_EXTRUDE6_DEPTH, mode=Mode.SUBTRACT)

    # 0.375 Fillet6
    f_0_375_fillet6_edges = [part.edges().sort_by_distance(p)[0] for p in [
        (25.93904982, -47.172485965, -34.045369625),
        (25.93904982, -57.800012761, 6.594630375),
        (25.93904982, -109.597036698, -34.045369625),
        (25.93904982, -112.15, -17.790458535),
        (25.93904982, -112.15, 6.594630375),
        (25.30404982, -35.8775, 76.2),
        (6.25404982, -35.8775, 76.2),
        (6.25404982, -58.1025, 76.2),
        (25.30404982, -58.1025, 76.2),
    ]]
    fillet(f_0_375_fillet6_edges, radius=F_0_375_FILLET6_R - 0.0001)  # a hair under: the kernel refuses the full size


solid = part.part
